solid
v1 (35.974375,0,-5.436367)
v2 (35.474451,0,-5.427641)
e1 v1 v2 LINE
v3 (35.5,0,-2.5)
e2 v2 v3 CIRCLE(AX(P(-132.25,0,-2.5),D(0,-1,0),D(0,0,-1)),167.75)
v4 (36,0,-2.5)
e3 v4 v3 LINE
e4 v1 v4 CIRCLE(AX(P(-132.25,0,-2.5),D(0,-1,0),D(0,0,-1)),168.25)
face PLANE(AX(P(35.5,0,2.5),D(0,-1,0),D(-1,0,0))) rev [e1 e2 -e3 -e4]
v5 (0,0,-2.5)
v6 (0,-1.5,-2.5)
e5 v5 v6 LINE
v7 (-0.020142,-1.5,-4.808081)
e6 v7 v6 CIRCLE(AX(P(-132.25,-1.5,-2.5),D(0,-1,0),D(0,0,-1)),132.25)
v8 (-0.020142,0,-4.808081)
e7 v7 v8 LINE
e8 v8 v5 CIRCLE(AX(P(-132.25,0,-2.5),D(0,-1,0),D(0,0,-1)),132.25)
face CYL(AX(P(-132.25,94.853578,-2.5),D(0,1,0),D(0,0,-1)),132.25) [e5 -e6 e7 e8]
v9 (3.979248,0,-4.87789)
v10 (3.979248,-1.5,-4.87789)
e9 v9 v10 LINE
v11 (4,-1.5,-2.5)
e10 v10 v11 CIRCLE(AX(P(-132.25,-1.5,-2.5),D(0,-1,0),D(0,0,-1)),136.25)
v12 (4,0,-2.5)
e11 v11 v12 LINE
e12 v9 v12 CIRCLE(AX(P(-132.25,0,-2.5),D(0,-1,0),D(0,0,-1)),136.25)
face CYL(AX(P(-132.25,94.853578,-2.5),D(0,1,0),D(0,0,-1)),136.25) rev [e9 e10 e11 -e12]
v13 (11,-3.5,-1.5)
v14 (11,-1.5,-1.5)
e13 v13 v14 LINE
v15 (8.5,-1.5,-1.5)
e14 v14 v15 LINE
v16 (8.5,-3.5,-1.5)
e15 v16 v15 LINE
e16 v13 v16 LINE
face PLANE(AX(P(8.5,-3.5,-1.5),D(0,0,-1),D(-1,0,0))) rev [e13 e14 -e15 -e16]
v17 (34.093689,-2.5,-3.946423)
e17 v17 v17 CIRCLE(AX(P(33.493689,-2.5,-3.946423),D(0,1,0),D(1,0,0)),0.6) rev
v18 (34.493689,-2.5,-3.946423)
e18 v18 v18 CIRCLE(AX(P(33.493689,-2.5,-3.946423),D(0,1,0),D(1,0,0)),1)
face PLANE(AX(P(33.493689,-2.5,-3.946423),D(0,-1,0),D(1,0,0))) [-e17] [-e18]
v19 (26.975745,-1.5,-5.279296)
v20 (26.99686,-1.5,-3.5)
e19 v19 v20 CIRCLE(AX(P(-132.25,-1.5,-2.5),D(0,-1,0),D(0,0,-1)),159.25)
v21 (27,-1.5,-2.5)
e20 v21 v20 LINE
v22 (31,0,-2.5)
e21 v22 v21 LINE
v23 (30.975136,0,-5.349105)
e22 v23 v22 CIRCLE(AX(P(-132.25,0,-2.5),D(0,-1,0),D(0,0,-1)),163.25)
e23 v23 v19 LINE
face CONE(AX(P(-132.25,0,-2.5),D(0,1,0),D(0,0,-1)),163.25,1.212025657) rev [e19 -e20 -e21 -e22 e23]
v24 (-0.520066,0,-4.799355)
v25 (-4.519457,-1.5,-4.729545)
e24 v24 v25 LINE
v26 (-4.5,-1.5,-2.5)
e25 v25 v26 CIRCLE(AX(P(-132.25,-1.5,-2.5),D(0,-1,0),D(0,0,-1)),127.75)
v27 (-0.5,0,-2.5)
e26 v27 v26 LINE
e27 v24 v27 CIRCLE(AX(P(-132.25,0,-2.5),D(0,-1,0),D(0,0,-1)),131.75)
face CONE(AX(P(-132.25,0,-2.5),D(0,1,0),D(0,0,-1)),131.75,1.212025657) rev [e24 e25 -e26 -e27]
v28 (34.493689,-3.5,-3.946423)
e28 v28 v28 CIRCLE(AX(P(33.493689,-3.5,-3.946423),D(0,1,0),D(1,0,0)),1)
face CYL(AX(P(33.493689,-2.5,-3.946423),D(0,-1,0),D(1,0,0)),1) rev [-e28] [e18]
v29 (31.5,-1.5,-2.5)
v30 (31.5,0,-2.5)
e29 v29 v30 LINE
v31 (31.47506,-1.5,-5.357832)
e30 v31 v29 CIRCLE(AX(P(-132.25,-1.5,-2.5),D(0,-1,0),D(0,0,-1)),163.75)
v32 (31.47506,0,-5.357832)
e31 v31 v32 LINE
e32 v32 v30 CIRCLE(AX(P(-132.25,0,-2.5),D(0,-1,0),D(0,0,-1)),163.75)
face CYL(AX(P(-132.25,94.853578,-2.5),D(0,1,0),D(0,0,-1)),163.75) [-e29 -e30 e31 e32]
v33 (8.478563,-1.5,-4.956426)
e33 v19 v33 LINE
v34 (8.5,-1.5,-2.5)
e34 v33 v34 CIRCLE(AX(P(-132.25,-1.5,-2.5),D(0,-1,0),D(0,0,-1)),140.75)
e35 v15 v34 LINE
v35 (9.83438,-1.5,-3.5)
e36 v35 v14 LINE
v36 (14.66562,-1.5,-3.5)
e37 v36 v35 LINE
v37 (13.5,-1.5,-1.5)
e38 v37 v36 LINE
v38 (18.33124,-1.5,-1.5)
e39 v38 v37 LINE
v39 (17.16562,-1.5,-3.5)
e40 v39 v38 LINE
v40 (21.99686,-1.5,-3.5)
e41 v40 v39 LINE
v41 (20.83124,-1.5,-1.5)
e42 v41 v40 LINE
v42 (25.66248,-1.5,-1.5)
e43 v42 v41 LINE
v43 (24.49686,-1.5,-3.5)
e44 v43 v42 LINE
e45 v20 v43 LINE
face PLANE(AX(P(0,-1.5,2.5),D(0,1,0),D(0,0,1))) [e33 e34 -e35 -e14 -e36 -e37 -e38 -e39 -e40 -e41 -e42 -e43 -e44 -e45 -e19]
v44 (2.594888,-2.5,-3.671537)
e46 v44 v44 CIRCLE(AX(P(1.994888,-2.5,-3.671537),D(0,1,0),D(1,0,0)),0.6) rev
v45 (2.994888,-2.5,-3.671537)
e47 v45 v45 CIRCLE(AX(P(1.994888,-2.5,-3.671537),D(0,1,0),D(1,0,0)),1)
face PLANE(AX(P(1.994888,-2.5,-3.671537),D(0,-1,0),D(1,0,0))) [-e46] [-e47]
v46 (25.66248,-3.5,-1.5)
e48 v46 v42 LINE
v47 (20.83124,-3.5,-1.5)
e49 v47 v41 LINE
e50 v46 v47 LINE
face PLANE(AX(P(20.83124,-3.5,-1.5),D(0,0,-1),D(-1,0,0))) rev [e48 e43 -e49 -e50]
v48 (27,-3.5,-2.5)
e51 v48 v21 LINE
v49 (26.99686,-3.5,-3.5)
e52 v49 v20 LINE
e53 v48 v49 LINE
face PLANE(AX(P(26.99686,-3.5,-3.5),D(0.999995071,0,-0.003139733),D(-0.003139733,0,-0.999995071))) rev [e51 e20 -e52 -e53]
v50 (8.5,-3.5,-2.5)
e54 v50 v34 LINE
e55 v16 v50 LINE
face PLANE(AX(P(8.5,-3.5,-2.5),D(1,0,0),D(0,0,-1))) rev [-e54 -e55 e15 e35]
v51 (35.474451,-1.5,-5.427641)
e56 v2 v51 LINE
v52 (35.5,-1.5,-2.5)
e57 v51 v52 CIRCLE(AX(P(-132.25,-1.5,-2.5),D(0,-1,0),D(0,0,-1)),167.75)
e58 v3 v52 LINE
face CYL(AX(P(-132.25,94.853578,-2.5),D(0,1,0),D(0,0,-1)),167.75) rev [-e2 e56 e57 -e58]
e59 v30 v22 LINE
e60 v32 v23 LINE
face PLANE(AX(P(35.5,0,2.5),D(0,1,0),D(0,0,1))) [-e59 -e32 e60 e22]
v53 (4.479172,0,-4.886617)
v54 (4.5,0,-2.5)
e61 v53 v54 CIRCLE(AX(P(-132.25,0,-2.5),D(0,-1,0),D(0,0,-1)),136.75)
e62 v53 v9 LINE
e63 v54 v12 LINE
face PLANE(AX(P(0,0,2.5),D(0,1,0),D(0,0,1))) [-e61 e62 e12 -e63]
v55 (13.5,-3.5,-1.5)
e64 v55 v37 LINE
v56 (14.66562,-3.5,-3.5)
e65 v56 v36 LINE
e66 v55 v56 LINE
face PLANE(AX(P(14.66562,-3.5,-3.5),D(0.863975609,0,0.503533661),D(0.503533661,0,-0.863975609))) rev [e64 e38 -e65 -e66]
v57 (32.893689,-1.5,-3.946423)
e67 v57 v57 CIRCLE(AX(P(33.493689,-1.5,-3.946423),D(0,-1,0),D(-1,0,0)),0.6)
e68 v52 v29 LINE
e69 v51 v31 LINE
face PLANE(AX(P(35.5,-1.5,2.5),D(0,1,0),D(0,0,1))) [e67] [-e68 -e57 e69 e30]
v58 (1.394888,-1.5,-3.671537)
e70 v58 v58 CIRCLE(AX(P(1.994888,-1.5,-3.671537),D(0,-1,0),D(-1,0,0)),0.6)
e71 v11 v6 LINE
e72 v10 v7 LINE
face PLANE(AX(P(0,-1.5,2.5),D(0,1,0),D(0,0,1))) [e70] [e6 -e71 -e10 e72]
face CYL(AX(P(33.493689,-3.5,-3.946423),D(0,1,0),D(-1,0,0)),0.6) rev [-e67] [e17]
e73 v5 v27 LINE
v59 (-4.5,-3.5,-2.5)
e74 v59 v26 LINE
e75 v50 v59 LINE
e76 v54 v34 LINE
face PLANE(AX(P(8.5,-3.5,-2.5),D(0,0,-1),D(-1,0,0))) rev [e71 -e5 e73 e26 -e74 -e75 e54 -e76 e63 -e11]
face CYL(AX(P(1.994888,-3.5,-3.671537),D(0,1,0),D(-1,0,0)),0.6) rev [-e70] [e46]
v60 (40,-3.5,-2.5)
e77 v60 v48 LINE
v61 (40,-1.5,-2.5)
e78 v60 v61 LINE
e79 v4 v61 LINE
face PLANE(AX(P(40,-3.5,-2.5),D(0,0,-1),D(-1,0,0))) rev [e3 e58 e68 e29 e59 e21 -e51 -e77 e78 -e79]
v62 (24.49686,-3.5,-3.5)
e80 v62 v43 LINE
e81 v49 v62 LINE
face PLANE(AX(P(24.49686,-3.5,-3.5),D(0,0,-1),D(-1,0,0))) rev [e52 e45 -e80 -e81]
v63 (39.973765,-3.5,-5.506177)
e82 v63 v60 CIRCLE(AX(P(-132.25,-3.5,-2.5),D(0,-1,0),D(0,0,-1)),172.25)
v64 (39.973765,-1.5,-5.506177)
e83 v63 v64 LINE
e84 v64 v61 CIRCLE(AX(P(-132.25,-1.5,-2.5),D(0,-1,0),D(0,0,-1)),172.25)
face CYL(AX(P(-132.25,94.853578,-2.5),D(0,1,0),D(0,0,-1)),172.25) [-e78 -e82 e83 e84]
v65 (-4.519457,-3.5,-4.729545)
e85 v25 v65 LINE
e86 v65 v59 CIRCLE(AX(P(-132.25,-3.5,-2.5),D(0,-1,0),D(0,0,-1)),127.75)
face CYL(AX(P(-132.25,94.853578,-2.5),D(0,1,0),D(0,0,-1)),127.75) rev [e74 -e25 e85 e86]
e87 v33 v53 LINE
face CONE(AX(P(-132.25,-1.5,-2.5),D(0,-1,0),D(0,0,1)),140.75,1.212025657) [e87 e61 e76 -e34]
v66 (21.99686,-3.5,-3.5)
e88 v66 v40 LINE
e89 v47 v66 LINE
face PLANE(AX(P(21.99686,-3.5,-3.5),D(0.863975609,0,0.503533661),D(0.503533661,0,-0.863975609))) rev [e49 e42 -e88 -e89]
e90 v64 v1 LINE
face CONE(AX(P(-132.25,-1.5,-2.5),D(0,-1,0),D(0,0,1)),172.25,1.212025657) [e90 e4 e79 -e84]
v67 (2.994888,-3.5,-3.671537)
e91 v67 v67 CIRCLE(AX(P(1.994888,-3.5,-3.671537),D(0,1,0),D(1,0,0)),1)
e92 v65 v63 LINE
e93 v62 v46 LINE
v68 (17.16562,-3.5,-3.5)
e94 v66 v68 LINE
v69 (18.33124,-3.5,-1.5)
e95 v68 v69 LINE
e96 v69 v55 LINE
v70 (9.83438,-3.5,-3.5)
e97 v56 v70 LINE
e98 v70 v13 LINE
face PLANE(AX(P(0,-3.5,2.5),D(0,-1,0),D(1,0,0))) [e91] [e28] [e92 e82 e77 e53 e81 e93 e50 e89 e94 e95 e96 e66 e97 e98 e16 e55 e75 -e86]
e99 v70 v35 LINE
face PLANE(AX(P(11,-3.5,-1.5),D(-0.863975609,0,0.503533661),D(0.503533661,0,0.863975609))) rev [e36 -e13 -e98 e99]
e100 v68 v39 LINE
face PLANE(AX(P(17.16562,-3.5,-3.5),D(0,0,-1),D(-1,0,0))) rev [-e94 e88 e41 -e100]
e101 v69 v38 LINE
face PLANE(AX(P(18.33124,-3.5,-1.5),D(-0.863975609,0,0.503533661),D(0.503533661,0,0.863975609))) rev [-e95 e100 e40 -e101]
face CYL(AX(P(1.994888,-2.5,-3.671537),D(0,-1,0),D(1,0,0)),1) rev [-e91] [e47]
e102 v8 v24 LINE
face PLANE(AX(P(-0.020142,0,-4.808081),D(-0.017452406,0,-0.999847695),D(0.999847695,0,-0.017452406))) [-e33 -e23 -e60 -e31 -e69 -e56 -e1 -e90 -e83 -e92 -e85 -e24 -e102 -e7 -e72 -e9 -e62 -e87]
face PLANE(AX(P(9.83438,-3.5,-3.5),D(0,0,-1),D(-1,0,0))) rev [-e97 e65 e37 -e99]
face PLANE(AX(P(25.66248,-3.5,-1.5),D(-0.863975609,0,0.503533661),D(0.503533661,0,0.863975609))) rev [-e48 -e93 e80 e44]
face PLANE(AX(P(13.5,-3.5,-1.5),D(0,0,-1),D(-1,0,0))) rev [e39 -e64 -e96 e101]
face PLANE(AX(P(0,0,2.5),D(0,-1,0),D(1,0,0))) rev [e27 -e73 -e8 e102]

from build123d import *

# Parameters (mm, degrees)
EXTRUDE_1_DEPTH          = 2.5
SKETCH_5_R               = 0.6
CUT_EXTRUDE_1_DEPTH      = 19.036421485
CUT_EXTRUDE_START        = -2
SKETCH_5_3_R             = 1
CUT_EXTRUDE_2_DEPTH      = 1
REVOLVE_1_ANGLE          = 1
SKETCH_9_R               = 0.6
CUT_EXTRUDE_3_DEPTH      = 41.426698916
SKETCH_9_3_R             = 1
CUT_EXTRUDE_4_DEPTH      = 1
SKETCH_10_W              = 73.33326834
SKETCH_10_H              = 28.500223869
CUT_EXTRUDE_5_DEPTH      = 41.528606999
CUT_EXTRUDE_8_DEPTH      = 41.426698916
CUT_EXTRUDE_8_DEPTH_BACK = 41.426698916


with BuildPart() as part:
    # 草图4 → 凸台-拉伸1 (new body)
    with BuildSketch(Plane.XY):
        Polygon((8.5, -1.5), (17.75, -1.5), (17.75, -3.5), (-4.5, -3.5), (-4.5, -1.5), (-0.5, 0), (0, 0), (0, -1.5), (4, -1.5), (4, 0), (4.5, 0), align=None)
    extrude(amount=EXTRUDE_1_DEPTH)

    # 草图5 → 切除-拉伸1 (cut, through all)
    with BuildSketch(Plane(origin=(0, -1.5, 0), x_dir=(1, 0, 0), z_dir=(0, 1, 0))):
        with Locations(Location((2, -1.25, 0), (0, 0, 270))):
            Circle(SKETCH_5_R)
    extrude(amount=-CUT_EXTRUDE_1_DEPTH, mode=Mode.SUBTRACT)

    # 草图5<3> → 切除-拉伸2 (cut)
    with BuildSketch(Plane(origin=(0, -1.5, 0), x_dir=(1, 0, 0), z_dir=(0, 1, 0)).offset(CUT_EXTRUDE_START)):
        with Locations((2, -1.25)):
            Circle(SKETCH_5_3_R)
    extrude(amount=CUT_EXTRUDE_2_DEPTH, mode=Mode.SUBTRACT)

    # 镜向1: part across plane


with BuildPart() as part_1:
    add(part.part)
    add(part.part.mirror(Plane(origin=(17.75, 0, 2.5), x_dir=(0, 0, 1), z_dir=(1, 0, 0))))

    # 草图6 → 旋转1 (revolve)
    with BuildSketch(Plane.XY.offset(2.5)):
        Polygon((0, 0), (-0.5, 0), (-4.5, -1.5), (-4.5, -3.5), (40, -3.5), (40, -1.5), (36, 0), (35.5, 0), (35.5, -1.5), (31.5, -1.5), (31.5, 0), (31, 0), (27, -1.5), (8.5, -1.5), (4.5, 0), (4, 0), (4, -1.5), (0, -1.5), align=None)
    revolve(axis=Axis((-132.25, 94.8535776, 2.5), (0, -1, 0)), revolution_arc=REVOLVE_1_ANGLE)

    # 草图9 → 切除-拉伸3 (cut, through all)
    with BuildSketch(Plane(origin=(0, -1.5, 0), x_dir=(1, 0, 0), z_dir=(0, 1, 0))):
        with Locations(Location((1.994888171, -3.671537391, 0), (0, 0, 180))):
            Circle(SKETCH_9_R)
        with Locations(Location((33.493688748, -3.946423259, 0), (0, 0, 180))):
            Circle(SKETCH_9_R)
    extrude(amount=-CUT_EXTRUDE_3_DEPTH, mode=Mode.SUBTRACT)

    # 草图9<3> → 切除-拉伸4 (cut)
    with BuildSketch(Plane(origin=(0, -1.5, 0), x_dir=(1, 0, 0), z_dir=(0, 1, 0)).offset(CUT_EXTRUDE_START)):
        with Locations((1.994888171, -3.671537391)):
            Circle(SKETCH_9_3_R)
        with Locations((33.493688748, -3.946423259)):
            Circle(SKETCH_9_3_R)
    extrude(amount=CUT_EXTRUDE_4_DEPTH, mode=Mode.SUBTRACT)

    # 镜向2: part across plane


with BuildPart() as part_2:
    add(part_1.part)
    add(part_1.part.mirror(Plane.XY))

    # 草图10 → 切除-拉伸5 (cut, through all)
    with BuildSketch(Plane(origin=(0, 0, 0), x_dir=(-1, 0, 0), z_dir=(0, 0, -1))):
        with Locations((-19.859748979, -4.462825858)):
            Rectangle(SKETCH_10_W, SKETCH_10_H)
    extrude(amount=-CUT_EXTRUDE_5_DEPTH, mode=Mode.SUBTRACT)

    # 草图11 → 切除-拉伸8 (cut, two sides: drawn at the far end of the back side and taken through both)
    with BuildSketch(Plane(origin=(0, -1.5, 0), x_dir=(1, 0, 0), z_dir=(0, 1, 0)).offset(-CUT_EXTRUDE_8_DEPTH_BACK)):
        Polygon((8.5, 2.5), (8.5, 1.5), (11, 1.5), (9.834379916, 3.5), (14.665620084, 3.5), (13.5, 1.5), (18.331240168, 1.5), (17.165620084, 3.5), (21.996860252, 3.5), (20.831240168, 1.5), (25.662480335, 1.5), (24.496860252, 3.5), (26.996860252, 3.5), (27, 2.5), (40, 2.5), (40, 0), (-4.5, 0), (-4.5, 2.5), align=None)
    extrude(amount=CUT_EXTRUDE_8_DEPTH + CUT_EXTRUDE_8_DEPTH_BACK, mode=Mode.SUBTRACT)


solid = part_2.part
